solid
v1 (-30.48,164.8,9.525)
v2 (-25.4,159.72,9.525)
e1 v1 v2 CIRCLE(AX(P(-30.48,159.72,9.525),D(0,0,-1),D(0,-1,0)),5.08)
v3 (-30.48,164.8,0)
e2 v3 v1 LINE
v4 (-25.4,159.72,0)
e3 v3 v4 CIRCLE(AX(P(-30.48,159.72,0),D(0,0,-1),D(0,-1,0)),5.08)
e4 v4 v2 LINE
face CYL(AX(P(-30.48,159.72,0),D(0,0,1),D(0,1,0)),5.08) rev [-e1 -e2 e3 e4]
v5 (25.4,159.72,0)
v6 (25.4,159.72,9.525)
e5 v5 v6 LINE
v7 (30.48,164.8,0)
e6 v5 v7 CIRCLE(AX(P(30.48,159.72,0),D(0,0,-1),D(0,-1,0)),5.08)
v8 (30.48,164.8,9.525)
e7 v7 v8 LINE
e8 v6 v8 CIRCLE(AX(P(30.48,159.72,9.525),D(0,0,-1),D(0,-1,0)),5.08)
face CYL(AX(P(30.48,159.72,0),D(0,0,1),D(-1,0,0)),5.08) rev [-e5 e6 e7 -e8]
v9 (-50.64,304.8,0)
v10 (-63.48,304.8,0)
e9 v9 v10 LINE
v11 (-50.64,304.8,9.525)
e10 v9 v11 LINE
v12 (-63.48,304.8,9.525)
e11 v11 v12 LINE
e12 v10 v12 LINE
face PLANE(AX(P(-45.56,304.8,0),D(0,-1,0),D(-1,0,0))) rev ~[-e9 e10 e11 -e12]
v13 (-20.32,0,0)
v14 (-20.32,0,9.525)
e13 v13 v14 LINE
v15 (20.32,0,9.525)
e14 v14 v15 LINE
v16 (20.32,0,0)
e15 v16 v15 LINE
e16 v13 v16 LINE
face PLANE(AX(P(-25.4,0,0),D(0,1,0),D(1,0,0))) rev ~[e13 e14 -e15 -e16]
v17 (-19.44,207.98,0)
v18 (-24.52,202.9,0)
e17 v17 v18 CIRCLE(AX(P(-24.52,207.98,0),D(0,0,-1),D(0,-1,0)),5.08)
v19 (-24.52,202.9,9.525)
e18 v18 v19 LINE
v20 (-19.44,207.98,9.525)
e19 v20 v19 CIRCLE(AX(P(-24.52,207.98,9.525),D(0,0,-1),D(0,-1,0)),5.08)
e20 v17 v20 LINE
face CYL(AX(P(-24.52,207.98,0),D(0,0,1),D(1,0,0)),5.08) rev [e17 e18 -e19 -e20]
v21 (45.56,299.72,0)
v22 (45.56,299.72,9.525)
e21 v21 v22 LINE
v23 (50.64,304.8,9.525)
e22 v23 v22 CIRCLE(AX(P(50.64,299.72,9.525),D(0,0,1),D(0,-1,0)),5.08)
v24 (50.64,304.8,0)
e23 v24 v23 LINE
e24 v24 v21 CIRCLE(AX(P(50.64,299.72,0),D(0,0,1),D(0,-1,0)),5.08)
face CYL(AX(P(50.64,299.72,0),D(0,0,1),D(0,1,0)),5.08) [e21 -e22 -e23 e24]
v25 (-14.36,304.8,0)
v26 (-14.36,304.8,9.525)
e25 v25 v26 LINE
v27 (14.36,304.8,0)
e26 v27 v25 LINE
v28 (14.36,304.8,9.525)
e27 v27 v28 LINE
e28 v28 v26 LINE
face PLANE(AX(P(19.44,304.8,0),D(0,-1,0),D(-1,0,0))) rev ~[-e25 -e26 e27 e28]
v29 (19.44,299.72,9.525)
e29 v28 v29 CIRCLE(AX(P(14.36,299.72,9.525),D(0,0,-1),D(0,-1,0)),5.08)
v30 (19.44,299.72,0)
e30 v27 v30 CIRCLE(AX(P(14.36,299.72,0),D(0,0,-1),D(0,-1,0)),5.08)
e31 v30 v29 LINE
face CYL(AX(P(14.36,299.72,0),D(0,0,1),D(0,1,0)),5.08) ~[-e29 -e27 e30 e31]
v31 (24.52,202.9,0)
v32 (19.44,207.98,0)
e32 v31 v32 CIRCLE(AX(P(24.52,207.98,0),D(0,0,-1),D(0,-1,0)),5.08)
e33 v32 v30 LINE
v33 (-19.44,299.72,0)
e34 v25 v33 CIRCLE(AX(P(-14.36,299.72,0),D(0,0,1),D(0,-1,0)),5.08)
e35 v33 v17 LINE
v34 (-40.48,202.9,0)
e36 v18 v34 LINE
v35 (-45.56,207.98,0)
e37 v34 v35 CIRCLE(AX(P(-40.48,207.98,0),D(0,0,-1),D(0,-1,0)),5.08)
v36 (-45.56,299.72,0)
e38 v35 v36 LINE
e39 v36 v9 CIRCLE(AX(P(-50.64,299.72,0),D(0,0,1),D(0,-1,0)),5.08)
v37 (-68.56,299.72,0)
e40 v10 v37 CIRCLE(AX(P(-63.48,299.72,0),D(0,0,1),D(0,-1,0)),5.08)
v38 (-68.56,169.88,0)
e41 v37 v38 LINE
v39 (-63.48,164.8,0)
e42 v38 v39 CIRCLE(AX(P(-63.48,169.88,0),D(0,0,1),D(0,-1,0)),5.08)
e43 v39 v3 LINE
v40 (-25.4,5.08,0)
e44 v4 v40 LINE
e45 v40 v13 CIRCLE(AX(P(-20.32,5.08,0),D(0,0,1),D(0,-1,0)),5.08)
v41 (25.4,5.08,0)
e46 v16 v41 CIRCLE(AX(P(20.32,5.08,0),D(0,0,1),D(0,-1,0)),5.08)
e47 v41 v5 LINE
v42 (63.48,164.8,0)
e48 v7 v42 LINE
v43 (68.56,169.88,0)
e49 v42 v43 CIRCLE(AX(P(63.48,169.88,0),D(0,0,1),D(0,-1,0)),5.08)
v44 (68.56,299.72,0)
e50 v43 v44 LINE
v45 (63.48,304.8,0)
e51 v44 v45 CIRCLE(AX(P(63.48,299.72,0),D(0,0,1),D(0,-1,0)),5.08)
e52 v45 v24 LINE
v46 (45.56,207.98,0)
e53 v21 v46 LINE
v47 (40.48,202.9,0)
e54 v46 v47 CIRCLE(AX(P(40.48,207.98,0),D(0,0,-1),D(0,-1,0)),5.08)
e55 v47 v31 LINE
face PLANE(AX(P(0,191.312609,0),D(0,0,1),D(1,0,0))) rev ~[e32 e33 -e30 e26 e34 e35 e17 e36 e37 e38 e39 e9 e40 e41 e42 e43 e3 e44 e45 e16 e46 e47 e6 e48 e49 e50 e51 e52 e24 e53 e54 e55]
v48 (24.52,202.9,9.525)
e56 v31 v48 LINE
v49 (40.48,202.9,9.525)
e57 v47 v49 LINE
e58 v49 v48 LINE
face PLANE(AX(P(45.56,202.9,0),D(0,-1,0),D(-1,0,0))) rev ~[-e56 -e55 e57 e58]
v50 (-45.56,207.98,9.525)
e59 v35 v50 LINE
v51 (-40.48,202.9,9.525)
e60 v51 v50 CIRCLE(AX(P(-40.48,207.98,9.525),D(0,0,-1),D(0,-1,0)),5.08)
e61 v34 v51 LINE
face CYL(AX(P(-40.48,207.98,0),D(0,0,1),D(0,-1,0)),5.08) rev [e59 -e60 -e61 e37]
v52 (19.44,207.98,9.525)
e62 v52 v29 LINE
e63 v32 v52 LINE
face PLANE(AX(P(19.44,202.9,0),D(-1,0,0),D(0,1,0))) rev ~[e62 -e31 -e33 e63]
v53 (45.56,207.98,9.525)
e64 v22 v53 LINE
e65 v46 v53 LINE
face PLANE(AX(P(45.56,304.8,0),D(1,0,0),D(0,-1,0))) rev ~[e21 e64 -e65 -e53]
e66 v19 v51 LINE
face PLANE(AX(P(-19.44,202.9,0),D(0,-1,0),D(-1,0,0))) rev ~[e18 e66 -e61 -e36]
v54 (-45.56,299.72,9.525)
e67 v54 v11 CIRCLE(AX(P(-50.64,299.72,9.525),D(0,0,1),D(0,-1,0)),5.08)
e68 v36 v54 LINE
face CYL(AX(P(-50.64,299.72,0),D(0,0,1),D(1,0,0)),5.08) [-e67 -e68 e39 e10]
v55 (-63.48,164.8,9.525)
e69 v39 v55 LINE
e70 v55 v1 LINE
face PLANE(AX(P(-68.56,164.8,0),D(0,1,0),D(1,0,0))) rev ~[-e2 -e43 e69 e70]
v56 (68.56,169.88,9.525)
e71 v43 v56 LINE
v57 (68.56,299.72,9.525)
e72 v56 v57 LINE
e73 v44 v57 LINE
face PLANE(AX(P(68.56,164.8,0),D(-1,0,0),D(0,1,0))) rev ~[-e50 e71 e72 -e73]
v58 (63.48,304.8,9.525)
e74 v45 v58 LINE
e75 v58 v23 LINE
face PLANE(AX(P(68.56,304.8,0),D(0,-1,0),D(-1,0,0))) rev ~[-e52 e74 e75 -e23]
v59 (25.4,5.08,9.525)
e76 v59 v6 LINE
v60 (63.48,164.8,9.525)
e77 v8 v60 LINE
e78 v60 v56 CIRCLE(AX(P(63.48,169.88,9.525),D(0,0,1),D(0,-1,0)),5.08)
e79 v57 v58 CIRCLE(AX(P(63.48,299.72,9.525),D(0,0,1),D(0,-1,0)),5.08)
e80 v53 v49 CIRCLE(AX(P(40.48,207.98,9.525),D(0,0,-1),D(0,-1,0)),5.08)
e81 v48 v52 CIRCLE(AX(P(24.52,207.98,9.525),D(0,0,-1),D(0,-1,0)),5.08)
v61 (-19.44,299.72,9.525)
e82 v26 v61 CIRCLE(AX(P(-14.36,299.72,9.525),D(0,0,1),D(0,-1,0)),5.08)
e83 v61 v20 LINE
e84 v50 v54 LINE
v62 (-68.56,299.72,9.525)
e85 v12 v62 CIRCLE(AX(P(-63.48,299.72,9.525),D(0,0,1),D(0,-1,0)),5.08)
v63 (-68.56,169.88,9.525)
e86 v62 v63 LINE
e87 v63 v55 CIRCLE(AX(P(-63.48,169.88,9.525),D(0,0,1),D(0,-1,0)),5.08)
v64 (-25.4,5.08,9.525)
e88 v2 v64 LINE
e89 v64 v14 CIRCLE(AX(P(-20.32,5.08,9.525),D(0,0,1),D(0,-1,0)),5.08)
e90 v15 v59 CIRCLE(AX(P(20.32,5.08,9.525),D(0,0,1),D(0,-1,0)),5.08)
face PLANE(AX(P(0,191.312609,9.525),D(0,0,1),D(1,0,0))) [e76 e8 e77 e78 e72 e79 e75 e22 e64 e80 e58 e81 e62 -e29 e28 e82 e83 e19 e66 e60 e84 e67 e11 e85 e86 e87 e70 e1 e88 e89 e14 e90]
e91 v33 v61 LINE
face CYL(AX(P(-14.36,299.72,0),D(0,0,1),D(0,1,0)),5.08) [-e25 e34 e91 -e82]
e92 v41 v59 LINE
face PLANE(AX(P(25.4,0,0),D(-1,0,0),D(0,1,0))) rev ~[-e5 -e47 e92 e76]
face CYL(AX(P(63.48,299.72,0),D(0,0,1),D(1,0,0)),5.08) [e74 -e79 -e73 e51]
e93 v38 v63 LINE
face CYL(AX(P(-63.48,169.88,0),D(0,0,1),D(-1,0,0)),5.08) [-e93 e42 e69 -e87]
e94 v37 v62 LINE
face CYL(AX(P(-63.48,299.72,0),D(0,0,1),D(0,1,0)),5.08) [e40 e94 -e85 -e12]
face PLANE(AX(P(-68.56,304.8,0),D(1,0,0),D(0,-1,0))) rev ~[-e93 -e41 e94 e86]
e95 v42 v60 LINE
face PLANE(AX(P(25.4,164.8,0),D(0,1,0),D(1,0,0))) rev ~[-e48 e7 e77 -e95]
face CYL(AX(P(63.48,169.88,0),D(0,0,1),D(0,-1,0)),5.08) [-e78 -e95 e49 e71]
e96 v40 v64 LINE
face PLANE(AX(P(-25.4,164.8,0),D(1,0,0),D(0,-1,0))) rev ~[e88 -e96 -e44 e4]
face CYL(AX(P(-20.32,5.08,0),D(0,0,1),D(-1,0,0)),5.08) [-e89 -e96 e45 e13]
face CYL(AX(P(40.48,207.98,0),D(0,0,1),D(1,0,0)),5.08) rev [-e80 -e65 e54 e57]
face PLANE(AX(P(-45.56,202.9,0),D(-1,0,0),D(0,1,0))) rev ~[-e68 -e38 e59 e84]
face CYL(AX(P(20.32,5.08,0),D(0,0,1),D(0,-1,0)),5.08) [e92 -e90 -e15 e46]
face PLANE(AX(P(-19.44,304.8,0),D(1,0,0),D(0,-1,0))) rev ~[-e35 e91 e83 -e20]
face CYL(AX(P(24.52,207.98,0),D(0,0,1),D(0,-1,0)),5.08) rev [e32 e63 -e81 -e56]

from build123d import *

# Parameters (mm, degrees)
F1_DEPTH = 9.525
F2_R     = 5.08


# Not quite as in the source:
# - a length typed as a fraction of an inch, garbled in the dataset ("3 / 203.2 mm" for 3/8 in), is restored


with BuildPart() as f1:
    # F0 (on Top) → F1 (new body)
    with BuildSketch(Plane.XY):
        Polygon((19.44, 304.8), (0, 304.8), (-19.44, 304.8), (-19.44, 202.9), (-45.56, 202.9), (-45.56, 304.8), (-68.56, 304.8), (-68.56, 164.8), (-25.4, 164.8), (-25.4, 0), (0, 0), (25.4, 0), (25.4, 164.8), (68.56, 164.8), (68.56, 304.8), (45.56, 304.8), (45.56, 202.9), (19.44, 202.9), align=None)
    extrude(amount=F1_DEPTH)

    # F2
    f2_edges = [f1.edges().sort_by_distance(p)[0] for p in [
        (68.56, 304.8, 4.7625),
        (45.56, 304.8, 4.7625),
        (19.44, 304.8, 4.7625),
        (-19.44, 304.8, 4.7625),
        (-45.56, 304.8, 4.7625),
        (-68.56, 304.8, 4.7625),
        (68.56, 164.8, 4.7625),
        (-25.4, 164.8, 4.7625),
        (-68.56, 164.8, 4.7625),
        (-45.56, 202.9, 4.7625),
        (19.44, 202.9, 4.7625),
        (-19.44, 202.9, 4.7625),
        (45.56, 202.9, 4.7625),
        (25.4, 164.8, 4.7625),
        (25.4, 0, 4.7625),
        (-25.4, 0, 4.7625),
    ]]
    fillet(f2_edges, radius=F2_R)


solid = f1.part
